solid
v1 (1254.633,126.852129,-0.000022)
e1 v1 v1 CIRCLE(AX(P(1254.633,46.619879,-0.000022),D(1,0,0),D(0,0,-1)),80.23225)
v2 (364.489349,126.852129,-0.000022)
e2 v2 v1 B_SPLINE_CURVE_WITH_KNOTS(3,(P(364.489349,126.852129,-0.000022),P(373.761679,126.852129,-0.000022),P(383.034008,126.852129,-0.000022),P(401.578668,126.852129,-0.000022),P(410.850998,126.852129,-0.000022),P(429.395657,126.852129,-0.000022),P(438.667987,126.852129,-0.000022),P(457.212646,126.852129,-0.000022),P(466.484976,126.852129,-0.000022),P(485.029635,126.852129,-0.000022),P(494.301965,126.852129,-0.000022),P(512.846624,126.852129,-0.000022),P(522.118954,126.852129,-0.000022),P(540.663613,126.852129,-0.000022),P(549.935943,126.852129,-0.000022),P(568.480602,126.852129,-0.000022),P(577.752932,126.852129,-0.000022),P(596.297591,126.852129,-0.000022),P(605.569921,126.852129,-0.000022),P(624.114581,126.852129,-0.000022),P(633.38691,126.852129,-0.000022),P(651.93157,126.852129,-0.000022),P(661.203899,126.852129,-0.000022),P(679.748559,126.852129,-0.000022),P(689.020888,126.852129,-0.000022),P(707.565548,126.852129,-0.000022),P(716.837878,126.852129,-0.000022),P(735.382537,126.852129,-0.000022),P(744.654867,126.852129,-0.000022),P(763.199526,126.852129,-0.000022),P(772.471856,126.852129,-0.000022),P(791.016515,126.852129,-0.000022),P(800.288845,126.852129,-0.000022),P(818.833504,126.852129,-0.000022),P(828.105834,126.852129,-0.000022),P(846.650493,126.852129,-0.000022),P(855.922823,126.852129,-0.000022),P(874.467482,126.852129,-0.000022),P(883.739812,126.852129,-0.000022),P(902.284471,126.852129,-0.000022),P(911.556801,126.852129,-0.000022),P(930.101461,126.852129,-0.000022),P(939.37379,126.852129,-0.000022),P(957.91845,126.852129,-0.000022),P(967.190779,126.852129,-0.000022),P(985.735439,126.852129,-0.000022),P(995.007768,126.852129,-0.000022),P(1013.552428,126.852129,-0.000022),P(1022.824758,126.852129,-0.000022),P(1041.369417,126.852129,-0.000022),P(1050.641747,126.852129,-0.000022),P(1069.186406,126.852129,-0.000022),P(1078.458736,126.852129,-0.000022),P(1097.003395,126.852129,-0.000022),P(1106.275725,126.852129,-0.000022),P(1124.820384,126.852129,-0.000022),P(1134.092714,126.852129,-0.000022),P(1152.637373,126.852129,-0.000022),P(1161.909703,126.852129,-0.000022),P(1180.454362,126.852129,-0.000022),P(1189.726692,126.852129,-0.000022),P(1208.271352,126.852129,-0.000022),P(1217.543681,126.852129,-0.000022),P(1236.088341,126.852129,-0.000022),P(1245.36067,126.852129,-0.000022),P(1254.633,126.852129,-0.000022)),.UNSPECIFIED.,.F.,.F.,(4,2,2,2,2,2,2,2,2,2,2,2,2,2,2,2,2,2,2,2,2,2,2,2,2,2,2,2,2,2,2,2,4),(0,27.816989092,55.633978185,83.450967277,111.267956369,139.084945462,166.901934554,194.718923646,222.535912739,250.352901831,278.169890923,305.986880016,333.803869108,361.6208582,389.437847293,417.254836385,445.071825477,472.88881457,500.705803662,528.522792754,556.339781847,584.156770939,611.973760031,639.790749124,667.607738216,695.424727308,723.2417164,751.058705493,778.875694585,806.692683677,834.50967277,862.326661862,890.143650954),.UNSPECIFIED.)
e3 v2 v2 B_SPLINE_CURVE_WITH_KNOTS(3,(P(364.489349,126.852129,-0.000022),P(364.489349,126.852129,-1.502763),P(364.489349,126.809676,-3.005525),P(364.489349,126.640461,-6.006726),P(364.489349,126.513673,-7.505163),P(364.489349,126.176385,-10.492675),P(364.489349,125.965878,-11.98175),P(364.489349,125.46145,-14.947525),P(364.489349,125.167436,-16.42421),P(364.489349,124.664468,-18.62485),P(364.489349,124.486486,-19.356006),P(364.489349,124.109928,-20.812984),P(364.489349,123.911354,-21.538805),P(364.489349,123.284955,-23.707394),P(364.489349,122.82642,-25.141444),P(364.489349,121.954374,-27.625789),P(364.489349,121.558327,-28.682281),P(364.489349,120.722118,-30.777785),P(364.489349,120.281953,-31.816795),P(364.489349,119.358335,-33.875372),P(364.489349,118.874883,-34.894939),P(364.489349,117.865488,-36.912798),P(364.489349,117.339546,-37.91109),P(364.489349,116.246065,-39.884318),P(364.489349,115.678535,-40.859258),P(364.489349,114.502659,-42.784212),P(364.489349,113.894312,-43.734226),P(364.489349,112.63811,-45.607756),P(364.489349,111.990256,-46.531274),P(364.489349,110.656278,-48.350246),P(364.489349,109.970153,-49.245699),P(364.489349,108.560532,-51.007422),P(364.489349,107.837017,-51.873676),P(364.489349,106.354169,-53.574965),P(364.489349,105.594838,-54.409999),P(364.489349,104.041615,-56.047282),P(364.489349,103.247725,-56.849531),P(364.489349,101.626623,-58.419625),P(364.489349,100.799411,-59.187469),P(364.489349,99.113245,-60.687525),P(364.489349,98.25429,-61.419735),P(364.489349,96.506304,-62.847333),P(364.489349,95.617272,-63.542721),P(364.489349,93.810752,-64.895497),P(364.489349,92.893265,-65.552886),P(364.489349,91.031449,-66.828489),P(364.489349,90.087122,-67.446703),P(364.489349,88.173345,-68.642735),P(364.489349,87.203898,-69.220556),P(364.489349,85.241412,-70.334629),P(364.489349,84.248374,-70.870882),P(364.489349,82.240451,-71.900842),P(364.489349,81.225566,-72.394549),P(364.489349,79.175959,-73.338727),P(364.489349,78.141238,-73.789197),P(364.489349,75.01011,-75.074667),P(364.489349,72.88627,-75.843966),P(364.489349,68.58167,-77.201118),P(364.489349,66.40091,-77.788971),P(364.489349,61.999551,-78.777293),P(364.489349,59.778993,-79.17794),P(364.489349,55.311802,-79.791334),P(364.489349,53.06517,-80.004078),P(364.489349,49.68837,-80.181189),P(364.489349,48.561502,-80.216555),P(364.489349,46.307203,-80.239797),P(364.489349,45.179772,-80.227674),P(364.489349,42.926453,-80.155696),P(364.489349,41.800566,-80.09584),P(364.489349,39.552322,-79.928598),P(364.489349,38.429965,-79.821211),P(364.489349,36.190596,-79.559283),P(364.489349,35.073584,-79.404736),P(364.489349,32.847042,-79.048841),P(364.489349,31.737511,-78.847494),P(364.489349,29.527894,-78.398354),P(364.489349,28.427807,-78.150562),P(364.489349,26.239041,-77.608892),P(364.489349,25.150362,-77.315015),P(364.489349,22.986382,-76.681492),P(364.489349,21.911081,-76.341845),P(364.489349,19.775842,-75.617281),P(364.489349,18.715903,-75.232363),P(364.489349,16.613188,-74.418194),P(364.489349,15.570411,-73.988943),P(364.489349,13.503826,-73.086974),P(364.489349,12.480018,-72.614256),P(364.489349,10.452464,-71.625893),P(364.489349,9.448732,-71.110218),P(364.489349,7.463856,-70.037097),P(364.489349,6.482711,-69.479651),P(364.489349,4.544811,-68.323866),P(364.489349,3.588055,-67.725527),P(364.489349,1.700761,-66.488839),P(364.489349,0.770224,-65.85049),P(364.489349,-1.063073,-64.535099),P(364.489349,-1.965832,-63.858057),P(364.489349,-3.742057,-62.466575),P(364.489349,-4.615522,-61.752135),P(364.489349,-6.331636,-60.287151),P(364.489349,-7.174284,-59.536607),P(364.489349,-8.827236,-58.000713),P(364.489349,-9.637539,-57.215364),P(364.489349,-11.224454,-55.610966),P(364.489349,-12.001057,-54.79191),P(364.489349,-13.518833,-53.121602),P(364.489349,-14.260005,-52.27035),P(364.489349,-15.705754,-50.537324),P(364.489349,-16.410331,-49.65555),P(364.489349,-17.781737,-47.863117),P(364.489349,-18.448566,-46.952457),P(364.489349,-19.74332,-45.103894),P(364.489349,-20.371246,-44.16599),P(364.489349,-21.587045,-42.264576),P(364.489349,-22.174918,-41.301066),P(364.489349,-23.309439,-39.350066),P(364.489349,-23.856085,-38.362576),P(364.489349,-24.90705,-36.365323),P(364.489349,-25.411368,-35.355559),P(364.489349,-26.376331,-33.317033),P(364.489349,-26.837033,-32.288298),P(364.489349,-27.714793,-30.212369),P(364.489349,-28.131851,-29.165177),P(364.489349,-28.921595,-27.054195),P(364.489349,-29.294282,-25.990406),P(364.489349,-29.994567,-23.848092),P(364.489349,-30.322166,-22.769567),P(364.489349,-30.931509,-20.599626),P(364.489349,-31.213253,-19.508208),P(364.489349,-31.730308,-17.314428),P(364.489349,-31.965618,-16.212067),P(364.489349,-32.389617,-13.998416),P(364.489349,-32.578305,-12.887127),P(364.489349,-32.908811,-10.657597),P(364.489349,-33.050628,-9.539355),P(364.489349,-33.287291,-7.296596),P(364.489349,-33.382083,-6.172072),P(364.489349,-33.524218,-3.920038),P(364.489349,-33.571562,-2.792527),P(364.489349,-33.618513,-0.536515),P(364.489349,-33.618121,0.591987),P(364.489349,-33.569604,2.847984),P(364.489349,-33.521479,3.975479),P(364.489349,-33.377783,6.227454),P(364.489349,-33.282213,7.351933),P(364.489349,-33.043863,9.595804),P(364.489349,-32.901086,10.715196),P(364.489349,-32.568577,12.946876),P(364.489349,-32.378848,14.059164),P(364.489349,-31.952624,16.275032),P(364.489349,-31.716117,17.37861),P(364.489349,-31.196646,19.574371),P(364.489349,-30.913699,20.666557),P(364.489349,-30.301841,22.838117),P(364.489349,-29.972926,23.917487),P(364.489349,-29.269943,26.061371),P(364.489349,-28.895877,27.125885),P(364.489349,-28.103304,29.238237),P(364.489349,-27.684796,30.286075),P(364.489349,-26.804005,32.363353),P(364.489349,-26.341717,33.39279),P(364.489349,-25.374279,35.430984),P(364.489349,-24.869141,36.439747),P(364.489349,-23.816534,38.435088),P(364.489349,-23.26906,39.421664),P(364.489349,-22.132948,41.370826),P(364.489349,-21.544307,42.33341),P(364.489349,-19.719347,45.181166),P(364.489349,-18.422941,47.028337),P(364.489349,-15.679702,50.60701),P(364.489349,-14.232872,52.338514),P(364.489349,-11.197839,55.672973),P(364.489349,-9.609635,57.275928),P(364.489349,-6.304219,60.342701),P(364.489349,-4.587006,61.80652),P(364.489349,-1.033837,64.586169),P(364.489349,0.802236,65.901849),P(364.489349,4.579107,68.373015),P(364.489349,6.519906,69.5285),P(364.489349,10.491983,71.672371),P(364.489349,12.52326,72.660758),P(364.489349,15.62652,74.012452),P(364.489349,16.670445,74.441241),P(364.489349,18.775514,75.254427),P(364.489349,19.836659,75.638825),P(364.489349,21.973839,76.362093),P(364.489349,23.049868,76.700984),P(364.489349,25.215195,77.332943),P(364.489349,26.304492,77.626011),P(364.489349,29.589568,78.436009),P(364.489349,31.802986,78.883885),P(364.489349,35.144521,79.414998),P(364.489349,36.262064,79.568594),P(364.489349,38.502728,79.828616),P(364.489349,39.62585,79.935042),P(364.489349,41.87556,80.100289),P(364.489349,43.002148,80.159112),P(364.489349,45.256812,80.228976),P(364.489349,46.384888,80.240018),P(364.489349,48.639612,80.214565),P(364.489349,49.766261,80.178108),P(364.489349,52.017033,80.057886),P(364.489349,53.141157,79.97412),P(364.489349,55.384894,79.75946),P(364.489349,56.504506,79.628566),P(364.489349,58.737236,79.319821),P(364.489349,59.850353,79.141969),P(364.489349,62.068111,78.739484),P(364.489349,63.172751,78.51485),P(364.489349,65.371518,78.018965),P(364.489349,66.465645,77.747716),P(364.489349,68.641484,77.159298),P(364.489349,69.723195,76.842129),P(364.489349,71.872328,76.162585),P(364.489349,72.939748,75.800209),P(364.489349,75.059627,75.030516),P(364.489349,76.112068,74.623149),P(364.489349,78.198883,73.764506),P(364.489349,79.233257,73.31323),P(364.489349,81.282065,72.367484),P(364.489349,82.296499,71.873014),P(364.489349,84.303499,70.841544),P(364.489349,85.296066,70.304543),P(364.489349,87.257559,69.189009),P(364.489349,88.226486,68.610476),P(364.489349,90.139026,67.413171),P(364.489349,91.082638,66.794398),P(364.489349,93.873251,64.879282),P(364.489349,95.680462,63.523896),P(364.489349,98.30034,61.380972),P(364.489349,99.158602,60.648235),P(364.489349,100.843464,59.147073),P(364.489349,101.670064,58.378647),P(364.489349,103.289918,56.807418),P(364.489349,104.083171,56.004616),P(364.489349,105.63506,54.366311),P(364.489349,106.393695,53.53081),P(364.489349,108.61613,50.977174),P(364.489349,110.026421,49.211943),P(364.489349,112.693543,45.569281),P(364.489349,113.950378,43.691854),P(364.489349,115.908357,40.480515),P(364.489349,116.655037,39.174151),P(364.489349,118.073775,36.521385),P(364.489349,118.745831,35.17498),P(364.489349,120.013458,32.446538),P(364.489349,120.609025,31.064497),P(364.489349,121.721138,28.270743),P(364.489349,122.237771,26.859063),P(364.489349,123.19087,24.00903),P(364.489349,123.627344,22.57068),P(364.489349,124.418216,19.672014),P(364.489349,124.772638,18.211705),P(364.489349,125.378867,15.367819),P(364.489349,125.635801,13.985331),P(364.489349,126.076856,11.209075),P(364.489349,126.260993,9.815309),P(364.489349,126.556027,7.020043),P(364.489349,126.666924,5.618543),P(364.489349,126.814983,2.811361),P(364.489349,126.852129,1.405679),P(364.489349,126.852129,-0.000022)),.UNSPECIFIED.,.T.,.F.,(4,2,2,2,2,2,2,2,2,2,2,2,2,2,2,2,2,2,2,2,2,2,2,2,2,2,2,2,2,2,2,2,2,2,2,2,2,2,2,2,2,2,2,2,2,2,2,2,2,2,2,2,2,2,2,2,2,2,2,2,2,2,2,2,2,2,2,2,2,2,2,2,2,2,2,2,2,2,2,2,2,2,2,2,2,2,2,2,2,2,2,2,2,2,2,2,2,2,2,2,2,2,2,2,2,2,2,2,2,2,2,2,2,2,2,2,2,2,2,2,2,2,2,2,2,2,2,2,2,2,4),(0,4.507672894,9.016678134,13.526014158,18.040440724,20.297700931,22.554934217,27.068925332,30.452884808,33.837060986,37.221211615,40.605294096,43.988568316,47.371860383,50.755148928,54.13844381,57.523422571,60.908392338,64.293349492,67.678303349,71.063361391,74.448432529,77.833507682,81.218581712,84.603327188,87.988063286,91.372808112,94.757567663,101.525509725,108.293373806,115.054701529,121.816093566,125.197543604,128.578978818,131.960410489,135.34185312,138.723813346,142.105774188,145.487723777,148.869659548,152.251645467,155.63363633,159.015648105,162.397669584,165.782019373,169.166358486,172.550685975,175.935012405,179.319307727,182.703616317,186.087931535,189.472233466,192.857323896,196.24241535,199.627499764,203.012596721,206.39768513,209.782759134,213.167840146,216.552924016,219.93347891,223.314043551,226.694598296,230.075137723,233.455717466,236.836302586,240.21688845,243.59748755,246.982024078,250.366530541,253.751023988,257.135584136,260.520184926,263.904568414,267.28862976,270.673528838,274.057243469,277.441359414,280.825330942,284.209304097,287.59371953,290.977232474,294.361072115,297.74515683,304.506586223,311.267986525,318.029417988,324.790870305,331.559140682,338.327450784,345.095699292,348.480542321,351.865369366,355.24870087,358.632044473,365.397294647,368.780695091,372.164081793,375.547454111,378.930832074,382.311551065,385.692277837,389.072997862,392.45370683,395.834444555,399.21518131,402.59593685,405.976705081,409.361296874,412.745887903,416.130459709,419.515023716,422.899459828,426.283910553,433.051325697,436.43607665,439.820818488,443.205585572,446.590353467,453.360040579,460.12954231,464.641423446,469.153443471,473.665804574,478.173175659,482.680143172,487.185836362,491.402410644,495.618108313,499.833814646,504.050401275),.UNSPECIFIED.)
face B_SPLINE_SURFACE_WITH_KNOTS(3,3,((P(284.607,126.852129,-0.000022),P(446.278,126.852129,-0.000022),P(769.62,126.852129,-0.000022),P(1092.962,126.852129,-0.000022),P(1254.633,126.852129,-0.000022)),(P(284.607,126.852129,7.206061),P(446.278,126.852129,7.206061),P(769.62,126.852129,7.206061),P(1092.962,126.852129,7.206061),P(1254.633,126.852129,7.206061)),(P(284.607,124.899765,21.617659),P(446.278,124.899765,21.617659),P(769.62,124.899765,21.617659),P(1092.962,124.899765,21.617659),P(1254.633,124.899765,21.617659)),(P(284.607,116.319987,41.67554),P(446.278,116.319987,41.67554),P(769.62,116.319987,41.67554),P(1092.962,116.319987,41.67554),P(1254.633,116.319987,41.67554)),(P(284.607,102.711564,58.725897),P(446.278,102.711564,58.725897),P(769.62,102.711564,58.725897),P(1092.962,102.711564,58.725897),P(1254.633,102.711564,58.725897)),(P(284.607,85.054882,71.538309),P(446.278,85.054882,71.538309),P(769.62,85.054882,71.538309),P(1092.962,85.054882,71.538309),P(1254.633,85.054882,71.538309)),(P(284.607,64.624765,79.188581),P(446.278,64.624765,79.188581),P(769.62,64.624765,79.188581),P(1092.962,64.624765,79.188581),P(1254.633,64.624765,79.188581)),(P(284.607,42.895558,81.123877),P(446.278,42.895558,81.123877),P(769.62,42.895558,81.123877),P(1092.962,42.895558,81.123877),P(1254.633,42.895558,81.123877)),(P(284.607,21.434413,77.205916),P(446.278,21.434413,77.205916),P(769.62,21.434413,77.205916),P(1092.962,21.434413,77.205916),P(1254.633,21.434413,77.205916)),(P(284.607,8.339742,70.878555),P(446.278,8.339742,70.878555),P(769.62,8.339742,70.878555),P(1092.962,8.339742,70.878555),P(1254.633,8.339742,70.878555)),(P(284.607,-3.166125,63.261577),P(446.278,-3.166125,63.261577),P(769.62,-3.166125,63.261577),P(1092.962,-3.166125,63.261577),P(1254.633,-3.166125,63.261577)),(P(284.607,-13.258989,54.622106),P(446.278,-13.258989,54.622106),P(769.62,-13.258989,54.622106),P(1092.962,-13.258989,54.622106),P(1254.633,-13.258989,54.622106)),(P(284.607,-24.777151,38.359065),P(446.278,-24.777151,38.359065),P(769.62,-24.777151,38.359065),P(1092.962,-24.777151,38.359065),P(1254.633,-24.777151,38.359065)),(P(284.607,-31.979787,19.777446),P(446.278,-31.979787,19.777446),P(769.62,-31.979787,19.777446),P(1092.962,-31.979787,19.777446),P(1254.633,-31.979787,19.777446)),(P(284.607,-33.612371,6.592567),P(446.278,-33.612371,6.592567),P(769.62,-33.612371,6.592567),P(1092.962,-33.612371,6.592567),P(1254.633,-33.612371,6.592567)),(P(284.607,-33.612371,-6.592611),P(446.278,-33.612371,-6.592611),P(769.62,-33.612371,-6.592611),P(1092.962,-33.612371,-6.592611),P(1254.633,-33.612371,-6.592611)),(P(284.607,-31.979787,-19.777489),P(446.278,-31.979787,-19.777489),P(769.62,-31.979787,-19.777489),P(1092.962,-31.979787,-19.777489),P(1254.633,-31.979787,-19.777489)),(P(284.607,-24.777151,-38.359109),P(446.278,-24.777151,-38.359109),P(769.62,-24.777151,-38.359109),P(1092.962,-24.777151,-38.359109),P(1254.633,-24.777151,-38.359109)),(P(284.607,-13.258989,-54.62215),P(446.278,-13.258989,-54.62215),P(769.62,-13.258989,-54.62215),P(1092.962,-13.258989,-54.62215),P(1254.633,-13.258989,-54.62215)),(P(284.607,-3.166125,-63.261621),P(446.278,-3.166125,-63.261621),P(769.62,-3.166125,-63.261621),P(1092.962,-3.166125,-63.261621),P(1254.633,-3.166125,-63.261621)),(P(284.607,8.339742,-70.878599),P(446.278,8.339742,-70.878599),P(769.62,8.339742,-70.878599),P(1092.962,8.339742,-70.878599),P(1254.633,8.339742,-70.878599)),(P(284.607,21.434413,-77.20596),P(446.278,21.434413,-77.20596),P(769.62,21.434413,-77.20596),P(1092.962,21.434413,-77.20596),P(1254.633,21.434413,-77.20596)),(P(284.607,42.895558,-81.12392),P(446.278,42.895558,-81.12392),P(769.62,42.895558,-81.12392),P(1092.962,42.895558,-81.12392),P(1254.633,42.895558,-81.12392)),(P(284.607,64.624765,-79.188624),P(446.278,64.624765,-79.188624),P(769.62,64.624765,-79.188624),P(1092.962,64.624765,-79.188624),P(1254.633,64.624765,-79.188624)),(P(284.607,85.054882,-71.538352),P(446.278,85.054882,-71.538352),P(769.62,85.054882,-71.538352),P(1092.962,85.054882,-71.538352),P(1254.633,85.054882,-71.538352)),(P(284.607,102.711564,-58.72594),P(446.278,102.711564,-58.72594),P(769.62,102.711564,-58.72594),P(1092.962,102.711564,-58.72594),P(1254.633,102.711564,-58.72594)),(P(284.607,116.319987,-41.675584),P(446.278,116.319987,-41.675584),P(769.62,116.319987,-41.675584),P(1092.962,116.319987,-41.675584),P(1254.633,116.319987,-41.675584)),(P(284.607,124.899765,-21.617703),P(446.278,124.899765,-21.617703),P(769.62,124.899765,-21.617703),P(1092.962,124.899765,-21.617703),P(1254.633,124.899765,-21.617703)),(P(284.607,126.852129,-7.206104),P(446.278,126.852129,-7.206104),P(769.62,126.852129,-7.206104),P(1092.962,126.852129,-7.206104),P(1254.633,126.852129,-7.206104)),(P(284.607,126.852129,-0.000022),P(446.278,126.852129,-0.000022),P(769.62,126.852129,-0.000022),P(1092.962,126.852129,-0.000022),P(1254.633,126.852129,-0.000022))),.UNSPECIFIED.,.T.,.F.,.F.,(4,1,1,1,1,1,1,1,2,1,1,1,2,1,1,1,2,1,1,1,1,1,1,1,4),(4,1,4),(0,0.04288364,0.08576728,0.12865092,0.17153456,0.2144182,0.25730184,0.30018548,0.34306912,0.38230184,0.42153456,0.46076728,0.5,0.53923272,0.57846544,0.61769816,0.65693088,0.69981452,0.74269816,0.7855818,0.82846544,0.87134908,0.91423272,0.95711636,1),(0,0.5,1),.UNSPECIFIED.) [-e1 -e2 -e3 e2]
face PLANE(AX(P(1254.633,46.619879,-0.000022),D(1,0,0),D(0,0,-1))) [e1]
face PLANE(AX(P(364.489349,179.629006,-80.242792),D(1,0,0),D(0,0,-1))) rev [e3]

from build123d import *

# Parameters (mm, degrees)
LOFT1_START             = 259.08
LOFT1_DEPTH             = 1021.08
SCALE1_SCALE            = 0.95
CUT_EXTRUDE1_DEPTH      = 1264.579309781
CUT_EXTRUDE1_DEPTH_BACK = 1264.579309781
SKETCH11_W              = 127.806536159
SKETCH11_H              = 326.946952964


# Read off the part's stored shape, not the designer's step: Loft1
with BuildPart() as part:
    # Loft1 outline → Loft1 (new body)
    with BuildSketch(Plane.YZ.offset(LOFT1_START)):
        with BuildLine():
            add(Edge.make_bspline(
                [(131.074840176, 0), (131.074840176, 7.585349878), (129.019719734, 22.755453715), (119.988374686, 43.869012627), (105.663719284, 61.816756347), (87.077737999, 75.303505752), (65.572351994, 83.356423395), (42.699502143, 85.39357748), (20.108822767, 81.269408641), (6.324958878, 74.609028267), (-5.786480365, 66.591156976), (-16.410547257, 57.496977056), (-28.534928085, 40.377986455), (-36.116650435, 20.818386871), (-37.835159824, 6.939567352), (-37.835159824, -6.939567352), (-36.116650435, -20.818386871), (-28.534928085, -40.377986455), (-16.410547257, -57.496977056), (-5.786480365, -66.591156976), (6.324958878, -74.609028267), (20.108822767, -81.269408641), (42.699502143, -85.39357748), (65.572351994, -83.356423395), (87.077737999, -75.303505752), (105.663719284, -61.816756347), (119.988374686, -43.869012627), (129.019719734, -22.755453715), (131.074840176, -7.585349878), (131.074840176, 0)],
                knots=[0, 0, 0, 0, 0.04288364, 0.08576728, 0.12865092, 0.17153456, 0.2144182, 0.25730184, 0.30018548, 0.34306912, 0.34306912, 0.38230184, 0.42153456, 0.46076728, 0.5, 0.5, 0.53923272, 0.57846544, 0.61769816, 0.65693088, 0.65693088, 0.69981452, 0.74269816, 0.7855818, 0.82846544, 0.87134908, 0.91423272, 0.95711636, 1, 1, 1, 1], degree=3))
        make_face()
    extrude(amount=LOFT1_DEPTH)


with BuildPart() as part_1:
    # Scale1: scaled about (769.62, 46.620923177, 0)
    add(part.part.scale(SCALE1_SCALE).moved(Location((38.481, 2.331046159, 0))))

    # Sketch11 → Cut-Extrude1 (cut, two sides: drawn at the far end of the back side and taken through both)
    with BuildSketch(Plane.XY.offset(-CUT_EXTRUDE1_DEPTH_BACK)):
        with Locations((300.586080967, 16.155529454)):
            Rectangle(SKETCH11_W, SKETCH11_H)
    extrude(amount=CUT_EXTRUDE1_DEPTH + CUT_EXTRUDE1_DEPTH_BACK, mode=Mode.SUBTRACT)


solid = part_1.part
